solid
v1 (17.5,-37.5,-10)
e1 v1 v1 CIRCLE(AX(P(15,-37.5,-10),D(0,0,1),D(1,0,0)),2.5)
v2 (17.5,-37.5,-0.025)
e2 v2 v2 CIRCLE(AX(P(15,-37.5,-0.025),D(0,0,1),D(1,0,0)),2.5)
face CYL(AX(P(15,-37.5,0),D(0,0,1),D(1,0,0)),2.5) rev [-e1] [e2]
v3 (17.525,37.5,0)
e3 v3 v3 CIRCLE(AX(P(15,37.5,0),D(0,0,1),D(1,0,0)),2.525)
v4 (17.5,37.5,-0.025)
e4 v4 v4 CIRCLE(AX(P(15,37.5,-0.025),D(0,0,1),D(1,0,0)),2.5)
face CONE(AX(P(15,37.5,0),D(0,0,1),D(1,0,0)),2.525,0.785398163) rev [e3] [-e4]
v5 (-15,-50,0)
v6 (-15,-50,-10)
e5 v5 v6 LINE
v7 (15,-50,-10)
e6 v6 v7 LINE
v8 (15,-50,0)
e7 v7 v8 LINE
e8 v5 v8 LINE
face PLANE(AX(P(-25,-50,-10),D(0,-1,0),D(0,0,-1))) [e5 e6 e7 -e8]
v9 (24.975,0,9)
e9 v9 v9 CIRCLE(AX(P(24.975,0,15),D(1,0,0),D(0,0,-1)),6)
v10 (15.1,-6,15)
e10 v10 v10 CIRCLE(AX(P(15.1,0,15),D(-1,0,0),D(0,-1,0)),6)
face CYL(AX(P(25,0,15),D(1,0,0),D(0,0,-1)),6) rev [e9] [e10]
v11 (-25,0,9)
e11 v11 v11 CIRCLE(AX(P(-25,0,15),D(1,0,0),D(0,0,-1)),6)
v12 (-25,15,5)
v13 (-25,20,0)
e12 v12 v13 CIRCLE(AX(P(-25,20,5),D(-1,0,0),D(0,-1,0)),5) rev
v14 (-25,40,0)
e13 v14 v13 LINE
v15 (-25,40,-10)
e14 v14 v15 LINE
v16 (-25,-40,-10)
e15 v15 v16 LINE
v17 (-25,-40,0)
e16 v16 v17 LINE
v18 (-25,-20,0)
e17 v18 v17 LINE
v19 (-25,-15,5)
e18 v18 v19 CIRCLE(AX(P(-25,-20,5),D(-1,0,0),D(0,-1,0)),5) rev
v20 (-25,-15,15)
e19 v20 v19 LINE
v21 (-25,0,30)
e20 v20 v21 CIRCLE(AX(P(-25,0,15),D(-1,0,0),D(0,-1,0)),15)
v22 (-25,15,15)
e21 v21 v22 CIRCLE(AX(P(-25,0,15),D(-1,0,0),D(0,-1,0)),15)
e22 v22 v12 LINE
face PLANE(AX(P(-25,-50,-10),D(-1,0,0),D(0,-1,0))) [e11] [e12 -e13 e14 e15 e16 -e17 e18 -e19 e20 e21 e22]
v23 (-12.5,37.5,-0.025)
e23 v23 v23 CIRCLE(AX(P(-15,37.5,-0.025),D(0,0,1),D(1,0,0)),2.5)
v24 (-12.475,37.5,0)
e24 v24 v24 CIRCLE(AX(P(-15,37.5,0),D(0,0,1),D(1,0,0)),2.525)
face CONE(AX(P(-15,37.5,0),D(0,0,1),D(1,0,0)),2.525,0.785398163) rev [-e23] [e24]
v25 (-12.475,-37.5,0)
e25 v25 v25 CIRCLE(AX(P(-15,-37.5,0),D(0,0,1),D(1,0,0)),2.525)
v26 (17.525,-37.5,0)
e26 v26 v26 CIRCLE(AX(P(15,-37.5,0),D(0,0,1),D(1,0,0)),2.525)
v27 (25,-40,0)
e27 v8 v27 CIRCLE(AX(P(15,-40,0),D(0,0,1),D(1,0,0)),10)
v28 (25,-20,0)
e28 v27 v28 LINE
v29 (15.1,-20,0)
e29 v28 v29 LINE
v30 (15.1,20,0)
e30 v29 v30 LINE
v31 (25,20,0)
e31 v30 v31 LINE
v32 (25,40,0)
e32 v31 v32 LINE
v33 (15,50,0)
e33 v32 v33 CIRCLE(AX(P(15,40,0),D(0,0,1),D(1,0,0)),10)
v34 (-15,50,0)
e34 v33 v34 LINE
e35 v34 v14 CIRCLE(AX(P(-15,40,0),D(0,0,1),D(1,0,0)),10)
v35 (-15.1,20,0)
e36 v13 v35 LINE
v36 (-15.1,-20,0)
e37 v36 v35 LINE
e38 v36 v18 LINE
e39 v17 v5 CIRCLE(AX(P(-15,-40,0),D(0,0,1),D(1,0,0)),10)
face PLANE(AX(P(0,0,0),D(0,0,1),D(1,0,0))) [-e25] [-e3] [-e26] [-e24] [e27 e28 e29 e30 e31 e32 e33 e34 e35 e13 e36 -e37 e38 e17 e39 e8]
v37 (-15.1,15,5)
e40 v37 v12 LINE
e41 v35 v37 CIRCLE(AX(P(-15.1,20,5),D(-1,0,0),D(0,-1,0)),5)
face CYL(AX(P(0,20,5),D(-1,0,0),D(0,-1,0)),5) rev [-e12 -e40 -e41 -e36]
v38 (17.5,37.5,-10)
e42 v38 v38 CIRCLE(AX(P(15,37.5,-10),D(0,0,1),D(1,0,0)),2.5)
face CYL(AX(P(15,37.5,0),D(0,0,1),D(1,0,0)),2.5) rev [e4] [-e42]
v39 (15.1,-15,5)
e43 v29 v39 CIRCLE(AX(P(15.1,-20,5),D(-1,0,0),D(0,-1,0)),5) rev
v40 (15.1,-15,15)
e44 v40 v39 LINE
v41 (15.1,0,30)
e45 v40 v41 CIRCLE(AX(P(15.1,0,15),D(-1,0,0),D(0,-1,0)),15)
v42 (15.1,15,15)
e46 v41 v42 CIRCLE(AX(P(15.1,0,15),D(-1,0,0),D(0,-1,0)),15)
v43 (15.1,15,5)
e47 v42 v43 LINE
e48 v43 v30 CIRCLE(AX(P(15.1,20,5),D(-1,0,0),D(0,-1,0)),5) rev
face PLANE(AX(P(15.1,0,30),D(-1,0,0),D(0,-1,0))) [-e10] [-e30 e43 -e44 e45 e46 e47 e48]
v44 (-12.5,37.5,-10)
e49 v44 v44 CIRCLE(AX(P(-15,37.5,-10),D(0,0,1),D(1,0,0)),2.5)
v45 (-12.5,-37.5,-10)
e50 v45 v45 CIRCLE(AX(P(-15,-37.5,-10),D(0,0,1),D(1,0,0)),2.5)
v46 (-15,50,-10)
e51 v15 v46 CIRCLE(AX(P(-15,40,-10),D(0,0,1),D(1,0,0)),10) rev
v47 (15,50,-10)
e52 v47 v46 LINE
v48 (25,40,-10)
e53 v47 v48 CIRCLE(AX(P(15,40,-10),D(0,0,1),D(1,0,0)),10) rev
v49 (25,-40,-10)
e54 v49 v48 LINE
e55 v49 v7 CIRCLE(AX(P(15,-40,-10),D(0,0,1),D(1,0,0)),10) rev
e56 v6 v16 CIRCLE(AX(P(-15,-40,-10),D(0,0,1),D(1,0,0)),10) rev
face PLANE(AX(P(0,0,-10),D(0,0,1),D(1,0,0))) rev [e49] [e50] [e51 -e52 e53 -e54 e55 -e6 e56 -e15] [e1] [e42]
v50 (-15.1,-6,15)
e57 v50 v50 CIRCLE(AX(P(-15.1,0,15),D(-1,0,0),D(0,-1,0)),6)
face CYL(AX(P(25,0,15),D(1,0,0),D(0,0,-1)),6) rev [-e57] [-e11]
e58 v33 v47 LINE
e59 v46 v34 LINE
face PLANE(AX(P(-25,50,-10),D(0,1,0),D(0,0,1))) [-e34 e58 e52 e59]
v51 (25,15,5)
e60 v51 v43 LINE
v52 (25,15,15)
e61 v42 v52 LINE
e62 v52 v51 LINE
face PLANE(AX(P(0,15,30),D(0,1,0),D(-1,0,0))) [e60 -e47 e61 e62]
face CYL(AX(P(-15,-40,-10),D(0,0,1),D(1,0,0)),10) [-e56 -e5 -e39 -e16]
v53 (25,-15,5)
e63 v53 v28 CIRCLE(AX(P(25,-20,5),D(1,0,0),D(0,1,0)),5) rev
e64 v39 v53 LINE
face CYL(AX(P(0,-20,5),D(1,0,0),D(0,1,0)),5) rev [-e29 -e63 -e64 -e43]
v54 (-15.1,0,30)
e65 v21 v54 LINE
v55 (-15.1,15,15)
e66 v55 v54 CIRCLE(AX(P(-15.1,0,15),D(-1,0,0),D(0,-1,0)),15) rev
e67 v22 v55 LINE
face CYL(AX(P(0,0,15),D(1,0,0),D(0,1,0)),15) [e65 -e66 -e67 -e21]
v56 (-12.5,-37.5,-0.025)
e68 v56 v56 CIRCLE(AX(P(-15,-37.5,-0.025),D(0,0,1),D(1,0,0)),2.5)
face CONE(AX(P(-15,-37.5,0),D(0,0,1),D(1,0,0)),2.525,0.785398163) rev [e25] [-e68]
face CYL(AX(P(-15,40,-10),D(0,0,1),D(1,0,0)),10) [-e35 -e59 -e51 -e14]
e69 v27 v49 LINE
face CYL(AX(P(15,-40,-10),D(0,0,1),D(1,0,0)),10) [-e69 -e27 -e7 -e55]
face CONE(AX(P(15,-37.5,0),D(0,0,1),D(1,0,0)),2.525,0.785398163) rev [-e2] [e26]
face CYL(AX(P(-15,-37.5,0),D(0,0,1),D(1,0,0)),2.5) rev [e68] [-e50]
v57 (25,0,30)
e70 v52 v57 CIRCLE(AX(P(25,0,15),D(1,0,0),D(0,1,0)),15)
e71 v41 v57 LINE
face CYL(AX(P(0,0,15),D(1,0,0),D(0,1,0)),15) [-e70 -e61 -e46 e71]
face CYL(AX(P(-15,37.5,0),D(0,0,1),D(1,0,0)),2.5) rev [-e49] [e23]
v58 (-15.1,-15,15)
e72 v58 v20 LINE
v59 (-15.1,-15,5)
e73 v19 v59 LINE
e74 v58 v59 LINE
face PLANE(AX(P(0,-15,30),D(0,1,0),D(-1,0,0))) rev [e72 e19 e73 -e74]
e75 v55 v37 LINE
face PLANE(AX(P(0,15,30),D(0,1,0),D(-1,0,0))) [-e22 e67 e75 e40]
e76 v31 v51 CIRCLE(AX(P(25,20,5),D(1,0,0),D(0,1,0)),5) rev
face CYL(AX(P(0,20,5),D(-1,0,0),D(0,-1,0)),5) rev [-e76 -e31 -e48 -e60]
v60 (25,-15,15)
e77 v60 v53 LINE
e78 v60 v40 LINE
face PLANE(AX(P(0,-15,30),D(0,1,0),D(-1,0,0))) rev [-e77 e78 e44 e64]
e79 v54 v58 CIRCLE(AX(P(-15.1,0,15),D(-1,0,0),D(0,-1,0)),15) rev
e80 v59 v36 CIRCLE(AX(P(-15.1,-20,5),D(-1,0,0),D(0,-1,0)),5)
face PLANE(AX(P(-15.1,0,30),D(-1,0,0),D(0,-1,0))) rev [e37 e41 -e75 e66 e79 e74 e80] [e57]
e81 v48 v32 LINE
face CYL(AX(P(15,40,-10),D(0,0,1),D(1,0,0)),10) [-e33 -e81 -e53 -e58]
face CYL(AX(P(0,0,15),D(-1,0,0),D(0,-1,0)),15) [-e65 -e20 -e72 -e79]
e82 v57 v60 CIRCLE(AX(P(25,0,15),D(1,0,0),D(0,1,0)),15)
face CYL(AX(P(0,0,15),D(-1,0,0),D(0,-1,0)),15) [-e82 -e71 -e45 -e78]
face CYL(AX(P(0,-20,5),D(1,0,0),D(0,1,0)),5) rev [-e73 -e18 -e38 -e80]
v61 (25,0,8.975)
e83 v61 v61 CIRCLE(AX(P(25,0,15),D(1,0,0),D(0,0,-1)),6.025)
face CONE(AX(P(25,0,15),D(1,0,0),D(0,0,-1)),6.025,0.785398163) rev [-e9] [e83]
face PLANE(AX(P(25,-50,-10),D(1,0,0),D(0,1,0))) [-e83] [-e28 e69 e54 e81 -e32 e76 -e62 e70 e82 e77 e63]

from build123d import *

# Parameters (mm, degrees)
SKETCH1_W                        = 100
SKETCH1_H                        = 50
BOSS_EXTRUDE1_DEPTH              = 10
SKETCH2_W                        = 30
SKETCH2_H                        = 9.9
BOSS_EXTRUDE2_DEPTH              = 30
FILLET1_R                        = 15
F_12_0MM_DOWEL_HOLE1_D           = 12
F_12_0MM_DOWEL_HOLE1_CSINK_D     = 12.05
F_12_0MM_DOWEL_HOLE1_CSINK_ANGLE = 90
F_5_0MM_DOWEL_HOLE1_D            = 5
F_5_0MM_DOWEL_HOLE1_CSINK_D      = 5.05
F_5_0MM_DOWEL_HOLE1_CSINK_ANGLE  = 90
FILLET2_R                        = 5
FILLET3_R                        = 10


with BuildPart() as part:
    # Sketch1 → Boss-Extrude1 (new body)
    with BuildSketch(Plane(origin=(0, 0, 0), x_dir=(0, 1, 0), z_dir=(0, 0, 1))):
        Rectangle(SKETCH1_W, SKETCH1_H)
    extrude(amount=-BOSS_EXTRUDE1_DEPTH)

    # Sketch2 → Boss-Extrude2 (add)
    with BuildSketch(Plane(origin=(0, 0, 0), x_dir=(0, 1, 0), z_dir=(0, 0, 1))):
        with Locations((0, 20.05)):
            Rectangle(SKETCH2_W, SKETCH2_H)
        with Locations((0, -20.05)):
            Rectangle(SKETCH2_W, SKETCH2_H)
    extrude(amount=BOSS_EXTRUDE2_DEPTH)

    # Fillet1
    fillet1_edges = [part.edges().sort_by_distance(p)[0] for p in [
        (20.05, 15, 30),
        (20.05, -15, 30),
        (-20.05, 15, 30),
        (-20.05, -15, 30),
    ]]
    fillet(fillet1_edges, radius=FILLET1_R - 0.0001)  # a hair under: the kernel refuses the full size

    # Ø12.0mm Dowel Hole1 (through all)
    with Locations(Plane.YZ.offset(25)):
        with Locations((0, 15)):
            CounterSinkHole(F_12_0MM_DOWEL_HOLE1_D / 2, F_12_0MM_DOWEL_HOLE1_CSINK_D / 2, counter_sink_angle=F_12_0MM_DOWEL_HOLE1_CSINK_ANGLE)

    # Ø5.0mm Dowel Hole1 (through all)
    with Locations(Plane(origin=(0, 0, 0), x_dir=(0, 1, 0), z_dir=(0, 0, 1))):
        with Locations((37.5, -15), (-37.5, 15), (-37.5, -15), (37.5, 15)):
            CounterSinkHole(F_5_0MM_DOWEL_HOLE1_D / 2, F_5_0MM_DOWEL_HOLE1_CSINK_D / 2, counter_sink_angle=F_5_0MM_DOWEL_HOLE1_CSINK_ANGLE)

    # Fillet2
    fillet2_edges = [part.edges().sort_by_distance(p)[0] for p in [
        (-20.05, -15, 0),
        (-20.05, 15, 0),
        (20.05, -15, 0),
        (20.05, 15, 0),
    ]]
    fillet(fillet2_edges, radius=FILLET2_R)

    # Fillet3
    fillet3_edges = [part.edges().sort_by_distance(p)[0] for p in [
        (-25, -50, -5),
        (-25, 50, -5),
        (25, 50, -5),
        (25, -50, -5),
    ]]
    fillet(fillet3_edges, radius=FILLET3_R)


solid = part.part
